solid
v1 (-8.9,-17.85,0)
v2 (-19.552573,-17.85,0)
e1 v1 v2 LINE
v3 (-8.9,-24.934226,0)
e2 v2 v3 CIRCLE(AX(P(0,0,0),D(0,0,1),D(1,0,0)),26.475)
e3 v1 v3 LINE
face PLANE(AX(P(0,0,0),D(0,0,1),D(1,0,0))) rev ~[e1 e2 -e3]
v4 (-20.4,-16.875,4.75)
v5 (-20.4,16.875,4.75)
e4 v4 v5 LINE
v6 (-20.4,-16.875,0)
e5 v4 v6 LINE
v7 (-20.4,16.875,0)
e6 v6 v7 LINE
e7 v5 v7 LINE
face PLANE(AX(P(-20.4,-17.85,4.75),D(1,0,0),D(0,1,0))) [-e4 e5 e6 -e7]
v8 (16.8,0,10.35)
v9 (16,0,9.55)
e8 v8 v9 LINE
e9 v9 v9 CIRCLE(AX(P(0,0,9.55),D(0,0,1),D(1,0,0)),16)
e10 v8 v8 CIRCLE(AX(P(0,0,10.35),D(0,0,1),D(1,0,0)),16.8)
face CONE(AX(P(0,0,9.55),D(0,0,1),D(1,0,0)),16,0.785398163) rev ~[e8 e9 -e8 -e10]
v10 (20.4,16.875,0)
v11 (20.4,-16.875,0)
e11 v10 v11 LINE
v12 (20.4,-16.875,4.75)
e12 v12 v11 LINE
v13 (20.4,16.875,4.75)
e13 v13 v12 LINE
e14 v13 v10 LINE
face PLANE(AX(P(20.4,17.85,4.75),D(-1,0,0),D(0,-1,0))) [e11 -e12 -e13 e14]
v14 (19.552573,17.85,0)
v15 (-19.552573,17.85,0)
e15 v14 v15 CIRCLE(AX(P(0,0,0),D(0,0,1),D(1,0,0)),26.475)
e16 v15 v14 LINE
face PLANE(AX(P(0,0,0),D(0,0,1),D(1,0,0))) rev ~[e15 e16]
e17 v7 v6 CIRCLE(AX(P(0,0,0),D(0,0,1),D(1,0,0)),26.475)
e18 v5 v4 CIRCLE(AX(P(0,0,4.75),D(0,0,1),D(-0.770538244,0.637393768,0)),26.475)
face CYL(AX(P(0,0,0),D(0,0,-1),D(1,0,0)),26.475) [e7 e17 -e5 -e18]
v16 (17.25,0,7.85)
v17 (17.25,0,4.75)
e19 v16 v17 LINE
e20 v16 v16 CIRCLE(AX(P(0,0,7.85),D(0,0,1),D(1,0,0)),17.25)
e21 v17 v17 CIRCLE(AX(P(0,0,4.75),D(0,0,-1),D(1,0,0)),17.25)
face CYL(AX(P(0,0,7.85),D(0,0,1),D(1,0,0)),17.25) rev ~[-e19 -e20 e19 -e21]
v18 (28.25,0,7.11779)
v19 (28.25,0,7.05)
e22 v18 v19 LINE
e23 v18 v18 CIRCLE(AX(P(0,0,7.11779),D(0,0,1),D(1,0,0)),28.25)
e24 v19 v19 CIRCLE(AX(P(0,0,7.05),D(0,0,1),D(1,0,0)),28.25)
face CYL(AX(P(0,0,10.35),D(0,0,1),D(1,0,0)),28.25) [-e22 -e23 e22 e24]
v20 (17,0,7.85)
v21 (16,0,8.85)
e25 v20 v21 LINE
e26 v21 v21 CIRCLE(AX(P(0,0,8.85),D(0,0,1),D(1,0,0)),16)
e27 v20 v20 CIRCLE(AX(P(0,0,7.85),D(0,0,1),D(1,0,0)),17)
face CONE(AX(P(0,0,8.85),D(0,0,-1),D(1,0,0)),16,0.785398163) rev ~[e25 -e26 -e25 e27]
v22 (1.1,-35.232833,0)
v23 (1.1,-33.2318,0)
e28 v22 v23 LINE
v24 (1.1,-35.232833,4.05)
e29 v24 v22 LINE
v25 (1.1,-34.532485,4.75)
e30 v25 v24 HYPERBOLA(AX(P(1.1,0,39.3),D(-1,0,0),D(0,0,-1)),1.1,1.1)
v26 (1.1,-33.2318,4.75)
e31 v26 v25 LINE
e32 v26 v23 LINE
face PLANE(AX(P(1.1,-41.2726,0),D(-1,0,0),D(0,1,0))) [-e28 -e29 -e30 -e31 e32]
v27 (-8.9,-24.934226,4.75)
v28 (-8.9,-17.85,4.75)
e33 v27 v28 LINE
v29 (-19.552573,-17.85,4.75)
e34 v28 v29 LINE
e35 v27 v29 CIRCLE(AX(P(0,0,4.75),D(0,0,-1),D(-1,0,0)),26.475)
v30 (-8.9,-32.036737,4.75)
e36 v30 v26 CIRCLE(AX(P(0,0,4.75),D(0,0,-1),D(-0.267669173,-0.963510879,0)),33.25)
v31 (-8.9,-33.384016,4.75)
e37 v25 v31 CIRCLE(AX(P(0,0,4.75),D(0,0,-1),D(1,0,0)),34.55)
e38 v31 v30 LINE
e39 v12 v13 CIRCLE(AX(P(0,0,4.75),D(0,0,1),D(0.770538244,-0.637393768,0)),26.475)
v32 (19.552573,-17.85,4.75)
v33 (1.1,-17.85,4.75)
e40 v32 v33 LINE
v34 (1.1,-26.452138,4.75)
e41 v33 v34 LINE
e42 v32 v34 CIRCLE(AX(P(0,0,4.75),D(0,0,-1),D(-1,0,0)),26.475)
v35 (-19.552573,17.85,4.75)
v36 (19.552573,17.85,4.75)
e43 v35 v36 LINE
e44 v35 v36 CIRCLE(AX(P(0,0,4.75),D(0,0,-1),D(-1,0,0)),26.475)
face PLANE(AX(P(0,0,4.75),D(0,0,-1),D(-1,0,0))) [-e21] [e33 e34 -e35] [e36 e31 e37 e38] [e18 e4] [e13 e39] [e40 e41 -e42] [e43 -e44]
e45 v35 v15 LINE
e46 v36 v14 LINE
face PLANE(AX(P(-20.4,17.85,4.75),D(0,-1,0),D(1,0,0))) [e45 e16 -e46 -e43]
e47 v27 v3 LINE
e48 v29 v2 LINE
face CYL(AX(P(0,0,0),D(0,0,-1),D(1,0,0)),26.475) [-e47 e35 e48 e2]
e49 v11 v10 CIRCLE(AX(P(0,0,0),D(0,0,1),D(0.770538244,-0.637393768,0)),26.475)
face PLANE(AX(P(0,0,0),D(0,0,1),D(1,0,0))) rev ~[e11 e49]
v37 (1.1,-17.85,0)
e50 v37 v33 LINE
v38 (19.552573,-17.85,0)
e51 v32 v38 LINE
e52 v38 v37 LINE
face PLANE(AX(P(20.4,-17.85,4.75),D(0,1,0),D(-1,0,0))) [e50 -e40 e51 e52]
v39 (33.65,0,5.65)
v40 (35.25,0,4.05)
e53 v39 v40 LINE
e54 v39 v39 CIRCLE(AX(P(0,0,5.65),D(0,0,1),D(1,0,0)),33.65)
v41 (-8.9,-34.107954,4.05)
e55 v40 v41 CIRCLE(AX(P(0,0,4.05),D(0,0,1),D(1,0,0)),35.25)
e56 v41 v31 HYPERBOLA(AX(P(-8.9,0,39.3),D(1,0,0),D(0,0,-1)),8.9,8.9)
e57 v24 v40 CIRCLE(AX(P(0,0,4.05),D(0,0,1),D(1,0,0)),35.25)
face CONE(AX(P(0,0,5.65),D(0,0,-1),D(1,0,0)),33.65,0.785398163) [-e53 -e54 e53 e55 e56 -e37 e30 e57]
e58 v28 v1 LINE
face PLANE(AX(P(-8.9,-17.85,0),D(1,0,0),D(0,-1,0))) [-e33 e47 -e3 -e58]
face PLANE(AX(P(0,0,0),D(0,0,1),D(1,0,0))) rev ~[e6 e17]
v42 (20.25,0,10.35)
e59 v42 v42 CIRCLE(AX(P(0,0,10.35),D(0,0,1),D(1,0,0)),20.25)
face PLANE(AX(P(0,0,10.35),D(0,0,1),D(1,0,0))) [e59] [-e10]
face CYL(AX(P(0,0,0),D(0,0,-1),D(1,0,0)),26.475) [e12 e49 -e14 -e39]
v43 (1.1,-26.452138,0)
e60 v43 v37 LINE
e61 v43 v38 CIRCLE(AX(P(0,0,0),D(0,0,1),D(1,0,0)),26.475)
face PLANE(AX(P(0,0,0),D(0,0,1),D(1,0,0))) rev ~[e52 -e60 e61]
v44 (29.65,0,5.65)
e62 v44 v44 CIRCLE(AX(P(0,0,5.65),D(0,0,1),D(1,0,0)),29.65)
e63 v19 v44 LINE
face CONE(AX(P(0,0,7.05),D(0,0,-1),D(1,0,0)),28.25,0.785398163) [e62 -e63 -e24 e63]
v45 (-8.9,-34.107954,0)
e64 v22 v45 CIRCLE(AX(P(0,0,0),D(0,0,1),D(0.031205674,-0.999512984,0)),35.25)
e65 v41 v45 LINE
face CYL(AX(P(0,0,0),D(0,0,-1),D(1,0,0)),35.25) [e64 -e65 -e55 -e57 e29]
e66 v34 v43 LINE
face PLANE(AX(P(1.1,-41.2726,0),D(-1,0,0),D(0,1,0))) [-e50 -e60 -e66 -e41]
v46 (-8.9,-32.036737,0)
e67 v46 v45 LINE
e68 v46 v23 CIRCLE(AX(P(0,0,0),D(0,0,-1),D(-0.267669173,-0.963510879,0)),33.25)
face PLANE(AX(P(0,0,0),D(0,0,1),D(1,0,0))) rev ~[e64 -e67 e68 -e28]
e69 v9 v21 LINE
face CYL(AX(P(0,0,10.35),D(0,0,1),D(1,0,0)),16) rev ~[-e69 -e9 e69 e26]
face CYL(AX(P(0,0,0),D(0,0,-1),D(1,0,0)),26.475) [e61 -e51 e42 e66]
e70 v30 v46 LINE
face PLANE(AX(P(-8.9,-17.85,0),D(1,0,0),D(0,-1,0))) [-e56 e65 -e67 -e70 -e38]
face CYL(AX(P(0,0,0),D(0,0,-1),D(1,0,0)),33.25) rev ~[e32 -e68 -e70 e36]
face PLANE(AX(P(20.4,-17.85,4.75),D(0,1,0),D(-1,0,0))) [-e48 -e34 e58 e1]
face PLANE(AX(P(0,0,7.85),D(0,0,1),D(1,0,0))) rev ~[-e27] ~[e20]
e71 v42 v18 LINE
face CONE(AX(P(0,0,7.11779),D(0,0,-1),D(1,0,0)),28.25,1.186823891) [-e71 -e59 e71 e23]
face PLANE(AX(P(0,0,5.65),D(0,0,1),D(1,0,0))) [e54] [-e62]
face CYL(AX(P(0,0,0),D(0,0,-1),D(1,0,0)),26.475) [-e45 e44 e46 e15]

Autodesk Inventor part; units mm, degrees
ref_plane "YZ Plane" through (0, 0, 0) normal (1, 0, 0) x (0, 1, 0)
ref_plane "XZ Plane" through (0, 0, 0) normal (0, 1, 0) x (-1, 0, 0)
ref_plane "XY Plane" through (0, 0, 0) normal (0, 0, 1) x (1, 0, 0)
sketch "Sketch1" plane through (0, 0, 0) normal (0, 0, 1) x (1, 0, 0)
  circle A0 centre (0, 0) radius 33.25
  circle A1 centre (0, 0) radius 26.475
  circle A2 centre (0, 0) radius 35.25
  dimension "d0" = 66.5
  dimension "d1" = 52.95
  dimension "d2" = 2
extrude "Extrusion1" add sketch "Sketch1" along normal blind 10.35
sketch "Sketch2" plane through (0, 0, 10.35) normal (0, 0, 1) x (1, 0, 0)
  circle A0 centre (0, 0) radius 35.25 projected
extrude "Extrusion2" add sketch "Sketch2" against normal blind 0.5
sketch "Sketch3" plane through (0, 0, 10.35) normal (0, 0, 1) x (1, 0, 0)
  circle A0 centre (0, 0) radius 16
  dimension "d7" = 32
extrude "Extrusion3" cut sketch "Sketch3" against normal blind 2.5
sketch "Sketch4" plane through (0, 0, 7.85) normal (0, 0, 1) x (1, 0, 0)
  circle A0 centre (0, 0) radius 17.25
  dimension "d10" = 34.5
extrude "Extrusion4" cut sketch "Sketch4" against normal blind 3.1
sketch "Sketch5" plane through (0, 0, 4.75) normal (0, 0, 1) x (1, 0, 0)
  line L0 (-20.4, 17.85) -> (20.4, 17.85)
  line L1 (20.4, 17.85) -> (20.4, -17.85)
  line L2 (20.4, -17.85) -> (-20.4, -17.85)
  line L3 (-20.4, -17.85) -> (-20.4, 17.85)
  point P0 (0, 0)
  dimension "d13" = 40.8
  dimension "d14" = 35.7
  dimension "d15" = 17.85
  dimension "d16" = 20.4
extrude "Extrusion5" cut sketch "Sketch5" against normal through all
chamfer "Chamfer1" distance 0.8 angle 45 1 edges at (-16, 0, 10.35)
sketch "Sketch6" plane through (0, 0, 9.85) normal (0, 0, -1) x (-1, 0, 0)
  circle A0 centre (0, 0) radius 33.25 projected
  circle A1 centre (0, 0) radius 26.475 projected
extrude "Extrusion6" add sketch "Sketch6" along normal up to surface (5.1 mm away)
chamfer "Chamfer4" distance 1 angle 45 1 edges at (-16, 0, 7.85)
sketch "Sketch7" plane through (0, 0, 0) normal (0, 0, -1) x (-1, 0, 0)
  line L0 (8.9, -41.2726) -> (-1.1, -41.2726)
  line L1 (-1.1, -41.2726) -> (-1.1, 4.8372)
  line L2 (-1.1, 4.8372) -> (8.9, 4.8372)
  line L3 (8.9, 4.8372) -> (8.9, -41.2726)
  line L4 (19.5526, -17.85) -> (-19.5526, -17.85) projected
  line L5 (-20.4, -16.875) -> (-20.4, 16.875) projected
  line L6 (20.4, 16.875) -> (20.4, -16.875) projected
  point P0 (0, 0)
  point P1 (3.9, -41.2726)
  dimension "d36" = 10
  dimension "d40" = 21.5
extrude "Extrusion7" cut sketch "Sketch7" against normal up to surface (4.75 mm away)
sketch "Sketch8" plane through (0, 0, 10.35) normal (0, 0, 1) x (1, 0, 0)
  circle A0 centre (0, 0) radius 35.25 projected
  circle A1 centre (0, 0) radius 28.25
  dimension "d41" = 7
extrude "Extrusion8" cut sketch "Sketch8" against normal blind 4.7
chamfer "Chamfer5" distance 8 angle 22 1 edges at (-28.25, 0, 10.35) measured on face at (23.997, -3.5937, 10.35)
chamfer "Chamfer6" distance 1.6 angle 45 1 edges at (-35.25, 0, 5.65)
chamfer "Chamfer7" distance 1.4 angle 45 1 edges at (-28.25, 0, 5.65)
equation "\"d15\" = 0.5 * d14"
equation "\"d16\" = 0.5 * d13"
properties part number "controls_knob_cover"
